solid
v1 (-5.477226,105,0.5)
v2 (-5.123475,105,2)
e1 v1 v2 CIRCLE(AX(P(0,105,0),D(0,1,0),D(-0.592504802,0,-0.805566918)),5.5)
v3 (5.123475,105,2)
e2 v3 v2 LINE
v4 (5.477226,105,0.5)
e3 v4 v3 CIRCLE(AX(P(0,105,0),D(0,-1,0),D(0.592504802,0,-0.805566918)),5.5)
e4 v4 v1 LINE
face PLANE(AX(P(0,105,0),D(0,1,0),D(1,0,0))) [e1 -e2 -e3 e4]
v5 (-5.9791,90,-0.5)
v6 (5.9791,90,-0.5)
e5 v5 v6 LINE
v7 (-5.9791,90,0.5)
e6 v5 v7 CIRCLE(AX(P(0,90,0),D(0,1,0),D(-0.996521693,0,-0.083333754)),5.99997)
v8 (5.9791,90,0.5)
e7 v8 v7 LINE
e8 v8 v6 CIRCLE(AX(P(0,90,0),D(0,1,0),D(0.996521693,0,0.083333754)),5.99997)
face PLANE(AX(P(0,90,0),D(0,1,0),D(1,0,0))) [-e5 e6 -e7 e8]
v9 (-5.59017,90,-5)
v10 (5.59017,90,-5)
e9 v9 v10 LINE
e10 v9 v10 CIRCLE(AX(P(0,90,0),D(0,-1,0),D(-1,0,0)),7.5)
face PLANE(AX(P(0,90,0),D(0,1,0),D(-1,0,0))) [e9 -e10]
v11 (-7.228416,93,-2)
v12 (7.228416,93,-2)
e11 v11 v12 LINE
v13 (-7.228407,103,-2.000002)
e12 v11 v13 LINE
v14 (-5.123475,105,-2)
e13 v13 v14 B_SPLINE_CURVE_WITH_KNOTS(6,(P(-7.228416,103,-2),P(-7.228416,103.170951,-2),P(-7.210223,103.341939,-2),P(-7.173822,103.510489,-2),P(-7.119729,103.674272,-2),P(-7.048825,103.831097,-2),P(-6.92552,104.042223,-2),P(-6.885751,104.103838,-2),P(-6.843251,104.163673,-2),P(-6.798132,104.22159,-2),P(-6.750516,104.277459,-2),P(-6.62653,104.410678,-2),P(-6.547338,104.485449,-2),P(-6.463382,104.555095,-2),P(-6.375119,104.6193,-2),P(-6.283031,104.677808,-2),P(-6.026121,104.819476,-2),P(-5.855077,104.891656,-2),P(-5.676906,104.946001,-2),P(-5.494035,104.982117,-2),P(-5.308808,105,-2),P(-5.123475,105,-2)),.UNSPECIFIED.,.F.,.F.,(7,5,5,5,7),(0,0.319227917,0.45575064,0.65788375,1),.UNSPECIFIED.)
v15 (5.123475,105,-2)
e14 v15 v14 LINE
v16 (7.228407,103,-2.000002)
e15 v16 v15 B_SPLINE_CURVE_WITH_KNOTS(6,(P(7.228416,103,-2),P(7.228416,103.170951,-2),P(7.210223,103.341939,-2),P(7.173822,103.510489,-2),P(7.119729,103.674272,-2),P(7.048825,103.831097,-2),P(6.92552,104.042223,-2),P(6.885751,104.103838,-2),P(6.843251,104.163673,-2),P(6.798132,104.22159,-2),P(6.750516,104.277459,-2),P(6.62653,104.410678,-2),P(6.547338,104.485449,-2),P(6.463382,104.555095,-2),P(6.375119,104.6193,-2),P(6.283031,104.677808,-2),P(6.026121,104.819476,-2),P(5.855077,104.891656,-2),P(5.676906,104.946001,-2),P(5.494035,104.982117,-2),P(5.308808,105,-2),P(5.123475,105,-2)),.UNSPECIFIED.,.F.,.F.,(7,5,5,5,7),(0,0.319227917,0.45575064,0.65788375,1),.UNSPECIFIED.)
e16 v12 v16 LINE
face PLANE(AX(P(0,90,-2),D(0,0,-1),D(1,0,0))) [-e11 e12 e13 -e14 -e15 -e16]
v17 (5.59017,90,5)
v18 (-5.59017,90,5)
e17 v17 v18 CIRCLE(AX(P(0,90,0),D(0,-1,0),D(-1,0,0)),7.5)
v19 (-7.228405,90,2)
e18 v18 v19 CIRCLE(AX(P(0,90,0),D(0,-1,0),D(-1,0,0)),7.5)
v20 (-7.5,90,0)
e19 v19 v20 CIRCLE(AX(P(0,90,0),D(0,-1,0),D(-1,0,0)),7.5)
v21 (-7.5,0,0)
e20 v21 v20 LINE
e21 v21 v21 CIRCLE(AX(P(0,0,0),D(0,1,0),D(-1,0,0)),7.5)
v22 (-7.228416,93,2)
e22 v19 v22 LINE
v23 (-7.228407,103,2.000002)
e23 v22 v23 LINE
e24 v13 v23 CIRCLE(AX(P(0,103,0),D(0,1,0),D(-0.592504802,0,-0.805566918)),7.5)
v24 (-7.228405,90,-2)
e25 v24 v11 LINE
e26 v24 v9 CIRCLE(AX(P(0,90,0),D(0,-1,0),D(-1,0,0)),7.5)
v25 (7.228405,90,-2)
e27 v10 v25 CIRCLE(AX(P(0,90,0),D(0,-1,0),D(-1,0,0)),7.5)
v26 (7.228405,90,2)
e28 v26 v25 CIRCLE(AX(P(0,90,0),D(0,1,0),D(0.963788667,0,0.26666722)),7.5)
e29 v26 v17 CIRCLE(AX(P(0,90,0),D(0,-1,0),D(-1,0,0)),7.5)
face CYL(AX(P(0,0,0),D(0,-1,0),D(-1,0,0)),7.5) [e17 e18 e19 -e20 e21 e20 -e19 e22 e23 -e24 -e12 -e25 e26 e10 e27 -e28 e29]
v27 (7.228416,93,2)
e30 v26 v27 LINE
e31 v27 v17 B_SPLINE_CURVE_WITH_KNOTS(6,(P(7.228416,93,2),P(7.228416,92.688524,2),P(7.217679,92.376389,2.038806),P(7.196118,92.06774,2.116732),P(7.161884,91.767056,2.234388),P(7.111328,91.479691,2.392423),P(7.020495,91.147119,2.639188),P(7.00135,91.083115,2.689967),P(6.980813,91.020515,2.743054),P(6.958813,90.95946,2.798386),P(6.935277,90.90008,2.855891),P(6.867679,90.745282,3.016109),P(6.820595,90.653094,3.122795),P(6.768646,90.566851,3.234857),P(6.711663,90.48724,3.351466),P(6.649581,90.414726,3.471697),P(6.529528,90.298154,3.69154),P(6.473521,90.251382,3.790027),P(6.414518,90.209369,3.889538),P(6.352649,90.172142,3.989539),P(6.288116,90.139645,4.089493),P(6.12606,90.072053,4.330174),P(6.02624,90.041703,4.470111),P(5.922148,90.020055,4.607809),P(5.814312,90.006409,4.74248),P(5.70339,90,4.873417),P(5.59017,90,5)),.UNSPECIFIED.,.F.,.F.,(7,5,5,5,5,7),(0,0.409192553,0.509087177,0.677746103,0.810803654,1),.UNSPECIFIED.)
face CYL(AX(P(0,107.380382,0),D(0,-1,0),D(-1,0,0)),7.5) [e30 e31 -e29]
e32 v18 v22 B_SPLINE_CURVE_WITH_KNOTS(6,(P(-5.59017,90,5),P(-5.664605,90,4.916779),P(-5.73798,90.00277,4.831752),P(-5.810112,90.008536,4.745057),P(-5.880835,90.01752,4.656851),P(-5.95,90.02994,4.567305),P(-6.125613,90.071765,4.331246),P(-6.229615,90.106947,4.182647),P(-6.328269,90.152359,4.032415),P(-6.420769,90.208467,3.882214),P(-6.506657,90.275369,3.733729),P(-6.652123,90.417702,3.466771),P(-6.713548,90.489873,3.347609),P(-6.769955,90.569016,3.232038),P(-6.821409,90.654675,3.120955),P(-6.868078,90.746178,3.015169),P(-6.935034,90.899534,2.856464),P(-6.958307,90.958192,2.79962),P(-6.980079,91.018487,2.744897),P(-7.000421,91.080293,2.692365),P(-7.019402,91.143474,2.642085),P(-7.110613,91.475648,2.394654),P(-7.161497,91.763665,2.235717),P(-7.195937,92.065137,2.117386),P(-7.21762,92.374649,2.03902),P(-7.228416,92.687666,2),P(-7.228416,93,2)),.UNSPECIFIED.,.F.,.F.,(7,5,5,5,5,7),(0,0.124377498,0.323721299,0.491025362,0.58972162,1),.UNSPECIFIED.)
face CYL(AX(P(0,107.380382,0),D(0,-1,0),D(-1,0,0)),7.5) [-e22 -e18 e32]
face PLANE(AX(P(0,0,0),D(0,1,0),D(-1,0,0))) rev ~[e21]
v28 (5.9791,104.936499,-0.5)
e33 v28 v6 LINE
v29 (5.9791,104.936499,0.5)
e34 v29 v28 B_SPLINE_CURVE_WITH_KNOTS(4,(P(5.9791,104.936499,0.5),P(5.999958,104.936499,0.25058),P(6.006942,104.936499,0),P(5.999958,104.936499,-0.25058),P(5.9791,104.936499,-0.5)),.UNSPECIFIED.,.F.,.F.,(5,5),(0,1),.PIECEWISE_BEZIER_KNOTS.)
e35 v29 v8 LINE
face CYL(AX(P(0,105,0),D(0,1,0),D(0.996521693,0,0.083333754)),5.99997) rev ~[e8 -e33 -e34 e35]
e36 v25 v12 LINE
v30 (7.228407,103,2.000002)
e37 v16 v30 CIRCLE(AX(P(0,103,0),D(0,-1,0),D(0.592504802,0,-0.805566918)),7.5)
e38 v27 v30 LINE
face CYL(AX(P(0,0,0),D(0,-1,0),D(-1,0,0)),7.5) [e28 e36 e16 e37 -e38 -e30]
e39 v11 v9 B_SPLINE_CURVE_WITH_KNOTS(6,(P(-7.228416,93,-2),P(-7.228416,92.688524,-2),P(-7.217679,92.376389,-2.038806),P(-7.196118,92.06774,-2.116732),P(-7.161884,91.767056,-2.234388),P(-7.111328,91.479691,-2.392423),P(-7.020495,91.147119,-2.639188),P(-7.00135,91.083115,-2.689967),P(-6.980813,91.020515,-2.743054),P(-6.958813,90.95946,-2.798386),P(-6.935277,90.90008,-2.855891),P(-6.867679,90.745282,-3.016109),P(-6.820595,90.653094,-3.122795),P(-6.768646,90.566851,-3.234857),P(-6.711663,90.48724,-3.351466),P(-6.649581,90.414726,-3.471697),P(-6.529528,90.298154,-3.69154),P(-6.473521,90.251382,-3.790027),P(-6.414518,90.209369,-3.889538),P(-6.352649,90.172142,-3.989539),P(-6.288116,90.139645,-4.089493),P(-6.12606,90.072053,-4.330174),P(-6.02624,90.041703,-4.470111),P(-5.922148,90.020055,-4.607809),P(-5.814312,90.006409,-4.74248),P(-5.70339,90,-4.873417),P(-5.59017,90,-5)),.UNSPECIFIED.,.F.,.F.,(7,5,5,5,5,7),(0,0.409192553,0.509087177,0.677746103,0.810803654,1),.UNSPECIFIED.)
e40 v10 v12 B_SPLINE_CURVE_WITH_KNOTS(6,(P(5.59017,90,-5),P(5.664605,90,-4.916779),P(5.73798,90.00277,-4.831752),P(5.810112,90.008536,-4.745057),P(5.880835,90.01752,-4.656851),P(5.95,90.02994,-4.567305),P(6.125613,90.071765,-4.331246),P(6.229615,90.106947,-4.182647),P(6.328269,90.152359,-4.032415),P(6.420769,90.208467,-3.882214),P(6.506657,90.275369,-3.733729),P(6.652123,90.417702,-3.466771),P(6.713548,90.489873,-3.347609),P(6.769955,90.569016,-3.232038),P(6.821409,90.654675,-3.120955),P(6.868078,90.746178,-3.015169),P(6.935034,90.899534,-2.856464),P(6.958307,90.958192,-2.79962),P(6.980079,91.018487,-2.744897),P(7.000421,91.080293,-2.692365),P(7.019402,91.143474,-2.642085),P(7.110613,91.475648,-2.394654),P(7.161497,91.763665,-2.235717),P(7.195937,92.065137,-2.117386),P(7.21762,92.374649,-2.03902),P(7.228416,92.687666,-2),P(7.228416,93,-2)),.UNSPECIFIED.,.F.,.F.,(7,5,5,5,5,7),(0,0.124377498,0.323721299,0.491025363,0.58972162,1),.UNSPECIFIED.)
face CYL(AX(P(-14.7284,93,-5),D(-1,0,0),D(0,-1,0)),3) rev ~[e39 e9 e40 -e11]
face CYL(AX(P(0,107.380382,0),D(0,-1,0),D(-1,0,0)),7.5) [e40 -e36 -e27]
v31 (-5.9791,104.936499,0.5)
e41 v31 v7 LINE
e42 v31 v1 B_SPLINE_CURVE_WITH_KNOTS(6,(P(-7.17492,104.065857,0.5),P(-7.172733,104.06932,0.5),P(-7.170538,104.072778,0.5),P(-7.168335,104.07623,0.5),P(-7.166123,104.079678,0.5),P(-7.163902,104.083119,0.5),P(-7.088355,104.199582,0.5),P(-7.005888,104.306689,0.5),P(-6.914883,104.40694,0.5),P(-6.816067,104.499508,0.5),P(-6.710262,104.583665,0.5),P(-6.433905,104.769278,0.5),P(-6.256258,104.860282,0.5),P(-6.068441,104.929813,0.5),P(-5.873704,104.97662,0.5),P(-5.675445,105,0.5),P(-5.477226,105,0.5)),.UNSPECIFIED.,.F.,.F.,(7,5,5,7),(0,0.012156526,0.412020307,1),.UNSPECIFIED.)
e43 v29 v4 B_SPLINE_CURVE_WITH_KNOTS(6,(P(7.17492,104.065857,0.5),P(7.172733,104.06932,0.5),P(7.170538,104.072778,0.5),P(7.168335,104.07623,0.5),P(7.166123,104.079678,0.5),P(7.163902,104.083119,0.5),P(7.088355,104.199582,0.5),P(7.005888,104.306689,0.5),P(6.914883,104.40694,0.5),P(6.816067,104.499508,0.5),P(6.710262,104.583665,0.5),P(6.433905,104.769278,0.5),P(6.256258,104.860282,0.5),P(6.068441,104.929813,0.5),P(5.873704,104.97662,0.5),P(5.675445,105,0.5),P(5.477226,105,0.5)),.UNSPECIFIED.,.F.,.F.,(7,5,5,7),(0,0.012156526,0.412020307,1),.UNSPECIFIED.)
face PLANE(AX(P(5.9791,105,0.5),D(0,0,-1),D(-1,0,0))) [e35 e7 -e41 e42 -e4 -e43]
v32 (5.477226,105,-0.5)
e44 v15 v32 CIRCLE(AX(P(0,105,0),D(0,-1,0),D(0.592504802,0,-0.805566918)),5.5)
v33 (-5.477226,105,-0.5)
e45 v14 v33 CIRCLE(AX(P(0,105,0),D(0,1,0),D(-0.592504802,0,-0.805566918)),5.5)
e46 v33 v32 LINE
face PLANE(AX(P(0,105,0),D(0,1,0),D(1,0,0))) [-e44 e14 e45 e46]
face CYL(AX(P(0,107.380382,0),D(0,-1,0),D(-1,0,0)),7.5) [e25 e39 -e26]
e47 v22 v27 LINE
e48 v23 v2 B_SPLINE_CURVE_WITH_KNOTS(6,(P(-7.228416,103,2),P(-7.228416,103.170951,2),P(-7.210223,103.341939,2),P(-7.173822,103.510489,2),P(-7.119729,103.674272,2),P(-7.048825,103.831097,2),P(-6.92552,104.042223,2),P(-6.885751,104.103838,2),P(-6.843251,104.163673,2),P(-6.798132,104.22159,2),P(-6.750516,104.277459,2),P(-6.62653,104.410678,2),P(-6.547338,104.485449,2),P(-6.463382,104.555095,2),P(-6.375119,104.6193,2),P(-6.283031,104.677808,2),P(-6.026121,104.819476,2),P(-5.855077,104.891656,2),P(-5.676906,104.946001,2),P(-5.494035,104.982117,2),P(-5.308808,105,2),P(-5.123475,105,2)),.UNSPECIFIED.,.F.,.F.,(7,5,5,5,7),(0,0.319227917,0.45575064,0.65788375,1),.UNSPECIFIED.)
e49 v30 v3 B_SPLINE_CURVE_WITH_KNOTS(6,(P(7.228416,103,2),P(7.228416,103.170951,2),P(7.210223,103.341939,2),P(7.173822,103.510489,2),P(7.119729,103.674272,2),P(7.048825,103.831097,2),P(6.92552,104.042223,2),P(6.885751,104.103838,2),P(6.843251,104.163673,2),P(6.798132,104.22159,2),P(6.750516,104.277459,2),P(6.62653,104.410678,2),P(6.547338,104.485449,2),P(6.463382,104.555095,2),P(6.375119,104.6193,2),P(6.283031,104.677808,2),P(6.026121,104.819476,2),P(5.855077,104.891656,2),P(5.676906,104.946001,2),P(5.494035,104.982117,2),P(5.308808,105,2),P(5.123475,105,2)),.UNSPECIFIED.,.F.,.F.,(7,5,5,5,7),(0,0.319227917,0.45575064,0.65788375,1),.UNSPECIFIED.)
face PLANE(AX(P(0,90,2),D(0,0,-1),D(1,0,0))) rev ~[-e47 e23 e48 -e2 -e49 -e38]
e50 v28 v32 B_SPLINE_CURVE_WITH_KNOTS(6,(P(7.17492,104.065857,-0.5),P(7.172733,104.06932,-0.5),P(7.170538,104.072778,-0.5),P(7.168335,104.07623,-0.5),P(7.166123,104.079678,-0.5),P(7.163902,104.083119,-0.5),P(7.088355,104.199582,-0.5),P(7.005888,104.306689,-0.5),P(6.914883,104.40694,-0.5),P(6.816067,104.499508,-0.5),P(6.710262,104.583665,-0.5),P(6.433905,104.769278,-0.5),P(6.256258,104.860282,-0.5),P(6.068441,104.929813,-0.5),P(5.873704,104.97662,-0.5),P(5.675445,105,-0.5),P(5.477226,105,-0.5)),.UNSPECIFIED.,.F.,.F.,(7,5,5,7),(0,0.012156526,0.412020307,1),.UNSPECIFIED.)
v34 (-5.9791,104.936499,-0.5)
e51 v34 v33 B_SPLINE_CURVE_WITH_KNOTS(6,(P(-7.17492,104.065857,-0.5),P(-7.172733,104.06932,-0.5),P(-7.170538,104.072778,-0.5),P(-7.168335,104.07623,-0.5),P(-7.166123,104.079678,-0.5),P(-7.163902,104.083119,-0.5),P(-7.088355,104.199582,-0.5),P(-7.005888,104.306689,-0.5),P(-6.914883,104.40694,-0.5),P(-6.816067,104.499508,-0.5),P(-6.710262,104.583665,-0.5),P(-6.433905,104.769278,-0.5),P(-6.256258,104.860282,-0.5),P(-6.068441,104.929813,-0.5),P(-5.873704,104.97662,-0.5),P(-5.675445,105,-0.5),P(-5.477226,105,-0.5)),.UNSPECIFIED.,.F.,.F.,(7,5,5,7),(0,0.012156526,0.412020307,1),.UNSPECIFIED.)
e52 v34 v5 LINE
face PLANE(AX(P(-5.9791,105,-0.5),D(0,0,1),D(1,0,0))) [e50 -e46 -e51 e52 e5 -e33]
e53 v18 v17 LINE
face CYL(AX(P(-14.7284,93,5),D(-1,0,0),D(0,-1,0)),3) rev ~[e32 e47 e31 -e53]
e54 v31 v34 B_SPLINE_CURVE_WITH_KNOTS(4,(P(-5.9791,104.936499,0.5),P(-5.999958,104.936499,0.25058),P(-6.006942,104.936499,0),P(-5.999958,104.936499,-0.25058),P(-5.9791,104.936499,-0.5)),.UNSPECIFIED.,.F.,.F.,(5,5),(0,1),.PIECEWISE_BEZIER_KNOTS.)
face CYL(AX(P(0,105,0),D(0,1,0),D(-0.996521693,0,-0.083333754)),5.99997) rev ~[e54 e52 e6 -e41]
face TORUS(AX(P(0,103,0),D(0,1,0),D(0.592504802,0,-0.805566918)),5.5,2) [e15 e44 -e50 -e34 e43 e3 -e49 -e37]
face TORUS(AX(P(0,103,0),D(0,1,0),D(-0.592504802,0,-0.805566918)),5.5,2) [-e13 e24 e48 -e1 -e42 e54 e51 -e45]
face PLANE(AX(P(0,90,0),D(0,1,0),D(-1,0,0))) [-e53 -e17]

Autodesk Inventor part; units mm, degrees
ref_plane "YZ Plane" through (0, 0, 0) normal (1, 0, 0) x (0, 1, 0)
ref_plane "XZ Plane" through (0, 0, 0) normal (0, 1, 0) x (-1, 0, 0)
ref_plane "XY Plane" through (0, 0, 0) normal (0, 0, 1) x (1, 0, 0)
sketch "Sketch1" plane through (0, 0, 0) normal (0, 1, 0) x (-1, 0, 0)
  line L0 (0, -10.5) -> (0, 10.5) projected
  line L1 (-10.5, 0) -> (10.5, 0) projected
  circle A0 centre (0, 0) radius 7.5
  dimension "d0" = 15
extrude "Extrusion1" add sketch "Sketch1" along normal blind 90
sketch "Sketch2" plane through (0, 90, 0) normal (0, 1, 0) x (1, 0, 0)
  line L0 (10.5, 0) -> (-10.5, 0) projected
  line L1 (0, 10.5) -> (0, -10.5) projected
  line L2 (-7.2284, 2) -> (7.2284, 2)
  line L3 (-7.2284, -2) -> (7.2284, -2)
  circle A0 centre (0, 0) radius 7.5 projected
  arc A1 (7.2284, -2) -> (7.2284, 2) centre (0, 0) ccw
  arc A2 (-7.2284, 2) -> (-7.2284, -2) centre (0, 0) ccw
  point P0 (7.2284, -2)
  dimension "d3" = 4
  dimension "d4" = 15
  dimension "d5" = 4
extrude "Extrusion2" add sketch "Sketch2" along normal blind 15 contours A0 L3 L1 L0 | L0 L1 L2 A0 | L1 L3 A0 L0 | L0 A0 L2 L1
fillet "Fillet1" radius 3 2 edges at (0, 90, 2) (0, 90, -2)
sketch "Sketch3" plane through (0, 105, 0) normal (0, 1, 0) x (1, 0, 0)
  line L0 (-7.2284, -2) -> (7.2284, -2) projected
  line L1 (7.2284, 2) -> (-7.2284, 2) projected
  arc A0 (7.2284, -2) -> (7.2284, 2) centre (0, 0) ccw projected
  arc A1 (-7.2284, 2) -> (-7.2284, -2) centre (0, 0) ccw projected
  line L2 (-5.9791, 0.5) -> (5.9791, 0.5)
  arc A2 (5.9791, -0.5) -> (5.9791, 0.5) centre (0, 0) ccw
  line L3 (5.9791, -0.5) -> (-5.9791, -0.5)
  arc A3 (-5.9791, 0.5) -> (-5.9791, -0.5) centre (0, 0) ccw
  dimension "d9" = 1.5
extrude "Extrusion3" cut sketch "Sketch3" against normal blind 15 contours L2 A2 L3 A3
fillet "Fillet2" radius 2 2 edges at (7.5, 105, 0) (-7.5, 105, 0)
properties part number "PUFIK_2"
